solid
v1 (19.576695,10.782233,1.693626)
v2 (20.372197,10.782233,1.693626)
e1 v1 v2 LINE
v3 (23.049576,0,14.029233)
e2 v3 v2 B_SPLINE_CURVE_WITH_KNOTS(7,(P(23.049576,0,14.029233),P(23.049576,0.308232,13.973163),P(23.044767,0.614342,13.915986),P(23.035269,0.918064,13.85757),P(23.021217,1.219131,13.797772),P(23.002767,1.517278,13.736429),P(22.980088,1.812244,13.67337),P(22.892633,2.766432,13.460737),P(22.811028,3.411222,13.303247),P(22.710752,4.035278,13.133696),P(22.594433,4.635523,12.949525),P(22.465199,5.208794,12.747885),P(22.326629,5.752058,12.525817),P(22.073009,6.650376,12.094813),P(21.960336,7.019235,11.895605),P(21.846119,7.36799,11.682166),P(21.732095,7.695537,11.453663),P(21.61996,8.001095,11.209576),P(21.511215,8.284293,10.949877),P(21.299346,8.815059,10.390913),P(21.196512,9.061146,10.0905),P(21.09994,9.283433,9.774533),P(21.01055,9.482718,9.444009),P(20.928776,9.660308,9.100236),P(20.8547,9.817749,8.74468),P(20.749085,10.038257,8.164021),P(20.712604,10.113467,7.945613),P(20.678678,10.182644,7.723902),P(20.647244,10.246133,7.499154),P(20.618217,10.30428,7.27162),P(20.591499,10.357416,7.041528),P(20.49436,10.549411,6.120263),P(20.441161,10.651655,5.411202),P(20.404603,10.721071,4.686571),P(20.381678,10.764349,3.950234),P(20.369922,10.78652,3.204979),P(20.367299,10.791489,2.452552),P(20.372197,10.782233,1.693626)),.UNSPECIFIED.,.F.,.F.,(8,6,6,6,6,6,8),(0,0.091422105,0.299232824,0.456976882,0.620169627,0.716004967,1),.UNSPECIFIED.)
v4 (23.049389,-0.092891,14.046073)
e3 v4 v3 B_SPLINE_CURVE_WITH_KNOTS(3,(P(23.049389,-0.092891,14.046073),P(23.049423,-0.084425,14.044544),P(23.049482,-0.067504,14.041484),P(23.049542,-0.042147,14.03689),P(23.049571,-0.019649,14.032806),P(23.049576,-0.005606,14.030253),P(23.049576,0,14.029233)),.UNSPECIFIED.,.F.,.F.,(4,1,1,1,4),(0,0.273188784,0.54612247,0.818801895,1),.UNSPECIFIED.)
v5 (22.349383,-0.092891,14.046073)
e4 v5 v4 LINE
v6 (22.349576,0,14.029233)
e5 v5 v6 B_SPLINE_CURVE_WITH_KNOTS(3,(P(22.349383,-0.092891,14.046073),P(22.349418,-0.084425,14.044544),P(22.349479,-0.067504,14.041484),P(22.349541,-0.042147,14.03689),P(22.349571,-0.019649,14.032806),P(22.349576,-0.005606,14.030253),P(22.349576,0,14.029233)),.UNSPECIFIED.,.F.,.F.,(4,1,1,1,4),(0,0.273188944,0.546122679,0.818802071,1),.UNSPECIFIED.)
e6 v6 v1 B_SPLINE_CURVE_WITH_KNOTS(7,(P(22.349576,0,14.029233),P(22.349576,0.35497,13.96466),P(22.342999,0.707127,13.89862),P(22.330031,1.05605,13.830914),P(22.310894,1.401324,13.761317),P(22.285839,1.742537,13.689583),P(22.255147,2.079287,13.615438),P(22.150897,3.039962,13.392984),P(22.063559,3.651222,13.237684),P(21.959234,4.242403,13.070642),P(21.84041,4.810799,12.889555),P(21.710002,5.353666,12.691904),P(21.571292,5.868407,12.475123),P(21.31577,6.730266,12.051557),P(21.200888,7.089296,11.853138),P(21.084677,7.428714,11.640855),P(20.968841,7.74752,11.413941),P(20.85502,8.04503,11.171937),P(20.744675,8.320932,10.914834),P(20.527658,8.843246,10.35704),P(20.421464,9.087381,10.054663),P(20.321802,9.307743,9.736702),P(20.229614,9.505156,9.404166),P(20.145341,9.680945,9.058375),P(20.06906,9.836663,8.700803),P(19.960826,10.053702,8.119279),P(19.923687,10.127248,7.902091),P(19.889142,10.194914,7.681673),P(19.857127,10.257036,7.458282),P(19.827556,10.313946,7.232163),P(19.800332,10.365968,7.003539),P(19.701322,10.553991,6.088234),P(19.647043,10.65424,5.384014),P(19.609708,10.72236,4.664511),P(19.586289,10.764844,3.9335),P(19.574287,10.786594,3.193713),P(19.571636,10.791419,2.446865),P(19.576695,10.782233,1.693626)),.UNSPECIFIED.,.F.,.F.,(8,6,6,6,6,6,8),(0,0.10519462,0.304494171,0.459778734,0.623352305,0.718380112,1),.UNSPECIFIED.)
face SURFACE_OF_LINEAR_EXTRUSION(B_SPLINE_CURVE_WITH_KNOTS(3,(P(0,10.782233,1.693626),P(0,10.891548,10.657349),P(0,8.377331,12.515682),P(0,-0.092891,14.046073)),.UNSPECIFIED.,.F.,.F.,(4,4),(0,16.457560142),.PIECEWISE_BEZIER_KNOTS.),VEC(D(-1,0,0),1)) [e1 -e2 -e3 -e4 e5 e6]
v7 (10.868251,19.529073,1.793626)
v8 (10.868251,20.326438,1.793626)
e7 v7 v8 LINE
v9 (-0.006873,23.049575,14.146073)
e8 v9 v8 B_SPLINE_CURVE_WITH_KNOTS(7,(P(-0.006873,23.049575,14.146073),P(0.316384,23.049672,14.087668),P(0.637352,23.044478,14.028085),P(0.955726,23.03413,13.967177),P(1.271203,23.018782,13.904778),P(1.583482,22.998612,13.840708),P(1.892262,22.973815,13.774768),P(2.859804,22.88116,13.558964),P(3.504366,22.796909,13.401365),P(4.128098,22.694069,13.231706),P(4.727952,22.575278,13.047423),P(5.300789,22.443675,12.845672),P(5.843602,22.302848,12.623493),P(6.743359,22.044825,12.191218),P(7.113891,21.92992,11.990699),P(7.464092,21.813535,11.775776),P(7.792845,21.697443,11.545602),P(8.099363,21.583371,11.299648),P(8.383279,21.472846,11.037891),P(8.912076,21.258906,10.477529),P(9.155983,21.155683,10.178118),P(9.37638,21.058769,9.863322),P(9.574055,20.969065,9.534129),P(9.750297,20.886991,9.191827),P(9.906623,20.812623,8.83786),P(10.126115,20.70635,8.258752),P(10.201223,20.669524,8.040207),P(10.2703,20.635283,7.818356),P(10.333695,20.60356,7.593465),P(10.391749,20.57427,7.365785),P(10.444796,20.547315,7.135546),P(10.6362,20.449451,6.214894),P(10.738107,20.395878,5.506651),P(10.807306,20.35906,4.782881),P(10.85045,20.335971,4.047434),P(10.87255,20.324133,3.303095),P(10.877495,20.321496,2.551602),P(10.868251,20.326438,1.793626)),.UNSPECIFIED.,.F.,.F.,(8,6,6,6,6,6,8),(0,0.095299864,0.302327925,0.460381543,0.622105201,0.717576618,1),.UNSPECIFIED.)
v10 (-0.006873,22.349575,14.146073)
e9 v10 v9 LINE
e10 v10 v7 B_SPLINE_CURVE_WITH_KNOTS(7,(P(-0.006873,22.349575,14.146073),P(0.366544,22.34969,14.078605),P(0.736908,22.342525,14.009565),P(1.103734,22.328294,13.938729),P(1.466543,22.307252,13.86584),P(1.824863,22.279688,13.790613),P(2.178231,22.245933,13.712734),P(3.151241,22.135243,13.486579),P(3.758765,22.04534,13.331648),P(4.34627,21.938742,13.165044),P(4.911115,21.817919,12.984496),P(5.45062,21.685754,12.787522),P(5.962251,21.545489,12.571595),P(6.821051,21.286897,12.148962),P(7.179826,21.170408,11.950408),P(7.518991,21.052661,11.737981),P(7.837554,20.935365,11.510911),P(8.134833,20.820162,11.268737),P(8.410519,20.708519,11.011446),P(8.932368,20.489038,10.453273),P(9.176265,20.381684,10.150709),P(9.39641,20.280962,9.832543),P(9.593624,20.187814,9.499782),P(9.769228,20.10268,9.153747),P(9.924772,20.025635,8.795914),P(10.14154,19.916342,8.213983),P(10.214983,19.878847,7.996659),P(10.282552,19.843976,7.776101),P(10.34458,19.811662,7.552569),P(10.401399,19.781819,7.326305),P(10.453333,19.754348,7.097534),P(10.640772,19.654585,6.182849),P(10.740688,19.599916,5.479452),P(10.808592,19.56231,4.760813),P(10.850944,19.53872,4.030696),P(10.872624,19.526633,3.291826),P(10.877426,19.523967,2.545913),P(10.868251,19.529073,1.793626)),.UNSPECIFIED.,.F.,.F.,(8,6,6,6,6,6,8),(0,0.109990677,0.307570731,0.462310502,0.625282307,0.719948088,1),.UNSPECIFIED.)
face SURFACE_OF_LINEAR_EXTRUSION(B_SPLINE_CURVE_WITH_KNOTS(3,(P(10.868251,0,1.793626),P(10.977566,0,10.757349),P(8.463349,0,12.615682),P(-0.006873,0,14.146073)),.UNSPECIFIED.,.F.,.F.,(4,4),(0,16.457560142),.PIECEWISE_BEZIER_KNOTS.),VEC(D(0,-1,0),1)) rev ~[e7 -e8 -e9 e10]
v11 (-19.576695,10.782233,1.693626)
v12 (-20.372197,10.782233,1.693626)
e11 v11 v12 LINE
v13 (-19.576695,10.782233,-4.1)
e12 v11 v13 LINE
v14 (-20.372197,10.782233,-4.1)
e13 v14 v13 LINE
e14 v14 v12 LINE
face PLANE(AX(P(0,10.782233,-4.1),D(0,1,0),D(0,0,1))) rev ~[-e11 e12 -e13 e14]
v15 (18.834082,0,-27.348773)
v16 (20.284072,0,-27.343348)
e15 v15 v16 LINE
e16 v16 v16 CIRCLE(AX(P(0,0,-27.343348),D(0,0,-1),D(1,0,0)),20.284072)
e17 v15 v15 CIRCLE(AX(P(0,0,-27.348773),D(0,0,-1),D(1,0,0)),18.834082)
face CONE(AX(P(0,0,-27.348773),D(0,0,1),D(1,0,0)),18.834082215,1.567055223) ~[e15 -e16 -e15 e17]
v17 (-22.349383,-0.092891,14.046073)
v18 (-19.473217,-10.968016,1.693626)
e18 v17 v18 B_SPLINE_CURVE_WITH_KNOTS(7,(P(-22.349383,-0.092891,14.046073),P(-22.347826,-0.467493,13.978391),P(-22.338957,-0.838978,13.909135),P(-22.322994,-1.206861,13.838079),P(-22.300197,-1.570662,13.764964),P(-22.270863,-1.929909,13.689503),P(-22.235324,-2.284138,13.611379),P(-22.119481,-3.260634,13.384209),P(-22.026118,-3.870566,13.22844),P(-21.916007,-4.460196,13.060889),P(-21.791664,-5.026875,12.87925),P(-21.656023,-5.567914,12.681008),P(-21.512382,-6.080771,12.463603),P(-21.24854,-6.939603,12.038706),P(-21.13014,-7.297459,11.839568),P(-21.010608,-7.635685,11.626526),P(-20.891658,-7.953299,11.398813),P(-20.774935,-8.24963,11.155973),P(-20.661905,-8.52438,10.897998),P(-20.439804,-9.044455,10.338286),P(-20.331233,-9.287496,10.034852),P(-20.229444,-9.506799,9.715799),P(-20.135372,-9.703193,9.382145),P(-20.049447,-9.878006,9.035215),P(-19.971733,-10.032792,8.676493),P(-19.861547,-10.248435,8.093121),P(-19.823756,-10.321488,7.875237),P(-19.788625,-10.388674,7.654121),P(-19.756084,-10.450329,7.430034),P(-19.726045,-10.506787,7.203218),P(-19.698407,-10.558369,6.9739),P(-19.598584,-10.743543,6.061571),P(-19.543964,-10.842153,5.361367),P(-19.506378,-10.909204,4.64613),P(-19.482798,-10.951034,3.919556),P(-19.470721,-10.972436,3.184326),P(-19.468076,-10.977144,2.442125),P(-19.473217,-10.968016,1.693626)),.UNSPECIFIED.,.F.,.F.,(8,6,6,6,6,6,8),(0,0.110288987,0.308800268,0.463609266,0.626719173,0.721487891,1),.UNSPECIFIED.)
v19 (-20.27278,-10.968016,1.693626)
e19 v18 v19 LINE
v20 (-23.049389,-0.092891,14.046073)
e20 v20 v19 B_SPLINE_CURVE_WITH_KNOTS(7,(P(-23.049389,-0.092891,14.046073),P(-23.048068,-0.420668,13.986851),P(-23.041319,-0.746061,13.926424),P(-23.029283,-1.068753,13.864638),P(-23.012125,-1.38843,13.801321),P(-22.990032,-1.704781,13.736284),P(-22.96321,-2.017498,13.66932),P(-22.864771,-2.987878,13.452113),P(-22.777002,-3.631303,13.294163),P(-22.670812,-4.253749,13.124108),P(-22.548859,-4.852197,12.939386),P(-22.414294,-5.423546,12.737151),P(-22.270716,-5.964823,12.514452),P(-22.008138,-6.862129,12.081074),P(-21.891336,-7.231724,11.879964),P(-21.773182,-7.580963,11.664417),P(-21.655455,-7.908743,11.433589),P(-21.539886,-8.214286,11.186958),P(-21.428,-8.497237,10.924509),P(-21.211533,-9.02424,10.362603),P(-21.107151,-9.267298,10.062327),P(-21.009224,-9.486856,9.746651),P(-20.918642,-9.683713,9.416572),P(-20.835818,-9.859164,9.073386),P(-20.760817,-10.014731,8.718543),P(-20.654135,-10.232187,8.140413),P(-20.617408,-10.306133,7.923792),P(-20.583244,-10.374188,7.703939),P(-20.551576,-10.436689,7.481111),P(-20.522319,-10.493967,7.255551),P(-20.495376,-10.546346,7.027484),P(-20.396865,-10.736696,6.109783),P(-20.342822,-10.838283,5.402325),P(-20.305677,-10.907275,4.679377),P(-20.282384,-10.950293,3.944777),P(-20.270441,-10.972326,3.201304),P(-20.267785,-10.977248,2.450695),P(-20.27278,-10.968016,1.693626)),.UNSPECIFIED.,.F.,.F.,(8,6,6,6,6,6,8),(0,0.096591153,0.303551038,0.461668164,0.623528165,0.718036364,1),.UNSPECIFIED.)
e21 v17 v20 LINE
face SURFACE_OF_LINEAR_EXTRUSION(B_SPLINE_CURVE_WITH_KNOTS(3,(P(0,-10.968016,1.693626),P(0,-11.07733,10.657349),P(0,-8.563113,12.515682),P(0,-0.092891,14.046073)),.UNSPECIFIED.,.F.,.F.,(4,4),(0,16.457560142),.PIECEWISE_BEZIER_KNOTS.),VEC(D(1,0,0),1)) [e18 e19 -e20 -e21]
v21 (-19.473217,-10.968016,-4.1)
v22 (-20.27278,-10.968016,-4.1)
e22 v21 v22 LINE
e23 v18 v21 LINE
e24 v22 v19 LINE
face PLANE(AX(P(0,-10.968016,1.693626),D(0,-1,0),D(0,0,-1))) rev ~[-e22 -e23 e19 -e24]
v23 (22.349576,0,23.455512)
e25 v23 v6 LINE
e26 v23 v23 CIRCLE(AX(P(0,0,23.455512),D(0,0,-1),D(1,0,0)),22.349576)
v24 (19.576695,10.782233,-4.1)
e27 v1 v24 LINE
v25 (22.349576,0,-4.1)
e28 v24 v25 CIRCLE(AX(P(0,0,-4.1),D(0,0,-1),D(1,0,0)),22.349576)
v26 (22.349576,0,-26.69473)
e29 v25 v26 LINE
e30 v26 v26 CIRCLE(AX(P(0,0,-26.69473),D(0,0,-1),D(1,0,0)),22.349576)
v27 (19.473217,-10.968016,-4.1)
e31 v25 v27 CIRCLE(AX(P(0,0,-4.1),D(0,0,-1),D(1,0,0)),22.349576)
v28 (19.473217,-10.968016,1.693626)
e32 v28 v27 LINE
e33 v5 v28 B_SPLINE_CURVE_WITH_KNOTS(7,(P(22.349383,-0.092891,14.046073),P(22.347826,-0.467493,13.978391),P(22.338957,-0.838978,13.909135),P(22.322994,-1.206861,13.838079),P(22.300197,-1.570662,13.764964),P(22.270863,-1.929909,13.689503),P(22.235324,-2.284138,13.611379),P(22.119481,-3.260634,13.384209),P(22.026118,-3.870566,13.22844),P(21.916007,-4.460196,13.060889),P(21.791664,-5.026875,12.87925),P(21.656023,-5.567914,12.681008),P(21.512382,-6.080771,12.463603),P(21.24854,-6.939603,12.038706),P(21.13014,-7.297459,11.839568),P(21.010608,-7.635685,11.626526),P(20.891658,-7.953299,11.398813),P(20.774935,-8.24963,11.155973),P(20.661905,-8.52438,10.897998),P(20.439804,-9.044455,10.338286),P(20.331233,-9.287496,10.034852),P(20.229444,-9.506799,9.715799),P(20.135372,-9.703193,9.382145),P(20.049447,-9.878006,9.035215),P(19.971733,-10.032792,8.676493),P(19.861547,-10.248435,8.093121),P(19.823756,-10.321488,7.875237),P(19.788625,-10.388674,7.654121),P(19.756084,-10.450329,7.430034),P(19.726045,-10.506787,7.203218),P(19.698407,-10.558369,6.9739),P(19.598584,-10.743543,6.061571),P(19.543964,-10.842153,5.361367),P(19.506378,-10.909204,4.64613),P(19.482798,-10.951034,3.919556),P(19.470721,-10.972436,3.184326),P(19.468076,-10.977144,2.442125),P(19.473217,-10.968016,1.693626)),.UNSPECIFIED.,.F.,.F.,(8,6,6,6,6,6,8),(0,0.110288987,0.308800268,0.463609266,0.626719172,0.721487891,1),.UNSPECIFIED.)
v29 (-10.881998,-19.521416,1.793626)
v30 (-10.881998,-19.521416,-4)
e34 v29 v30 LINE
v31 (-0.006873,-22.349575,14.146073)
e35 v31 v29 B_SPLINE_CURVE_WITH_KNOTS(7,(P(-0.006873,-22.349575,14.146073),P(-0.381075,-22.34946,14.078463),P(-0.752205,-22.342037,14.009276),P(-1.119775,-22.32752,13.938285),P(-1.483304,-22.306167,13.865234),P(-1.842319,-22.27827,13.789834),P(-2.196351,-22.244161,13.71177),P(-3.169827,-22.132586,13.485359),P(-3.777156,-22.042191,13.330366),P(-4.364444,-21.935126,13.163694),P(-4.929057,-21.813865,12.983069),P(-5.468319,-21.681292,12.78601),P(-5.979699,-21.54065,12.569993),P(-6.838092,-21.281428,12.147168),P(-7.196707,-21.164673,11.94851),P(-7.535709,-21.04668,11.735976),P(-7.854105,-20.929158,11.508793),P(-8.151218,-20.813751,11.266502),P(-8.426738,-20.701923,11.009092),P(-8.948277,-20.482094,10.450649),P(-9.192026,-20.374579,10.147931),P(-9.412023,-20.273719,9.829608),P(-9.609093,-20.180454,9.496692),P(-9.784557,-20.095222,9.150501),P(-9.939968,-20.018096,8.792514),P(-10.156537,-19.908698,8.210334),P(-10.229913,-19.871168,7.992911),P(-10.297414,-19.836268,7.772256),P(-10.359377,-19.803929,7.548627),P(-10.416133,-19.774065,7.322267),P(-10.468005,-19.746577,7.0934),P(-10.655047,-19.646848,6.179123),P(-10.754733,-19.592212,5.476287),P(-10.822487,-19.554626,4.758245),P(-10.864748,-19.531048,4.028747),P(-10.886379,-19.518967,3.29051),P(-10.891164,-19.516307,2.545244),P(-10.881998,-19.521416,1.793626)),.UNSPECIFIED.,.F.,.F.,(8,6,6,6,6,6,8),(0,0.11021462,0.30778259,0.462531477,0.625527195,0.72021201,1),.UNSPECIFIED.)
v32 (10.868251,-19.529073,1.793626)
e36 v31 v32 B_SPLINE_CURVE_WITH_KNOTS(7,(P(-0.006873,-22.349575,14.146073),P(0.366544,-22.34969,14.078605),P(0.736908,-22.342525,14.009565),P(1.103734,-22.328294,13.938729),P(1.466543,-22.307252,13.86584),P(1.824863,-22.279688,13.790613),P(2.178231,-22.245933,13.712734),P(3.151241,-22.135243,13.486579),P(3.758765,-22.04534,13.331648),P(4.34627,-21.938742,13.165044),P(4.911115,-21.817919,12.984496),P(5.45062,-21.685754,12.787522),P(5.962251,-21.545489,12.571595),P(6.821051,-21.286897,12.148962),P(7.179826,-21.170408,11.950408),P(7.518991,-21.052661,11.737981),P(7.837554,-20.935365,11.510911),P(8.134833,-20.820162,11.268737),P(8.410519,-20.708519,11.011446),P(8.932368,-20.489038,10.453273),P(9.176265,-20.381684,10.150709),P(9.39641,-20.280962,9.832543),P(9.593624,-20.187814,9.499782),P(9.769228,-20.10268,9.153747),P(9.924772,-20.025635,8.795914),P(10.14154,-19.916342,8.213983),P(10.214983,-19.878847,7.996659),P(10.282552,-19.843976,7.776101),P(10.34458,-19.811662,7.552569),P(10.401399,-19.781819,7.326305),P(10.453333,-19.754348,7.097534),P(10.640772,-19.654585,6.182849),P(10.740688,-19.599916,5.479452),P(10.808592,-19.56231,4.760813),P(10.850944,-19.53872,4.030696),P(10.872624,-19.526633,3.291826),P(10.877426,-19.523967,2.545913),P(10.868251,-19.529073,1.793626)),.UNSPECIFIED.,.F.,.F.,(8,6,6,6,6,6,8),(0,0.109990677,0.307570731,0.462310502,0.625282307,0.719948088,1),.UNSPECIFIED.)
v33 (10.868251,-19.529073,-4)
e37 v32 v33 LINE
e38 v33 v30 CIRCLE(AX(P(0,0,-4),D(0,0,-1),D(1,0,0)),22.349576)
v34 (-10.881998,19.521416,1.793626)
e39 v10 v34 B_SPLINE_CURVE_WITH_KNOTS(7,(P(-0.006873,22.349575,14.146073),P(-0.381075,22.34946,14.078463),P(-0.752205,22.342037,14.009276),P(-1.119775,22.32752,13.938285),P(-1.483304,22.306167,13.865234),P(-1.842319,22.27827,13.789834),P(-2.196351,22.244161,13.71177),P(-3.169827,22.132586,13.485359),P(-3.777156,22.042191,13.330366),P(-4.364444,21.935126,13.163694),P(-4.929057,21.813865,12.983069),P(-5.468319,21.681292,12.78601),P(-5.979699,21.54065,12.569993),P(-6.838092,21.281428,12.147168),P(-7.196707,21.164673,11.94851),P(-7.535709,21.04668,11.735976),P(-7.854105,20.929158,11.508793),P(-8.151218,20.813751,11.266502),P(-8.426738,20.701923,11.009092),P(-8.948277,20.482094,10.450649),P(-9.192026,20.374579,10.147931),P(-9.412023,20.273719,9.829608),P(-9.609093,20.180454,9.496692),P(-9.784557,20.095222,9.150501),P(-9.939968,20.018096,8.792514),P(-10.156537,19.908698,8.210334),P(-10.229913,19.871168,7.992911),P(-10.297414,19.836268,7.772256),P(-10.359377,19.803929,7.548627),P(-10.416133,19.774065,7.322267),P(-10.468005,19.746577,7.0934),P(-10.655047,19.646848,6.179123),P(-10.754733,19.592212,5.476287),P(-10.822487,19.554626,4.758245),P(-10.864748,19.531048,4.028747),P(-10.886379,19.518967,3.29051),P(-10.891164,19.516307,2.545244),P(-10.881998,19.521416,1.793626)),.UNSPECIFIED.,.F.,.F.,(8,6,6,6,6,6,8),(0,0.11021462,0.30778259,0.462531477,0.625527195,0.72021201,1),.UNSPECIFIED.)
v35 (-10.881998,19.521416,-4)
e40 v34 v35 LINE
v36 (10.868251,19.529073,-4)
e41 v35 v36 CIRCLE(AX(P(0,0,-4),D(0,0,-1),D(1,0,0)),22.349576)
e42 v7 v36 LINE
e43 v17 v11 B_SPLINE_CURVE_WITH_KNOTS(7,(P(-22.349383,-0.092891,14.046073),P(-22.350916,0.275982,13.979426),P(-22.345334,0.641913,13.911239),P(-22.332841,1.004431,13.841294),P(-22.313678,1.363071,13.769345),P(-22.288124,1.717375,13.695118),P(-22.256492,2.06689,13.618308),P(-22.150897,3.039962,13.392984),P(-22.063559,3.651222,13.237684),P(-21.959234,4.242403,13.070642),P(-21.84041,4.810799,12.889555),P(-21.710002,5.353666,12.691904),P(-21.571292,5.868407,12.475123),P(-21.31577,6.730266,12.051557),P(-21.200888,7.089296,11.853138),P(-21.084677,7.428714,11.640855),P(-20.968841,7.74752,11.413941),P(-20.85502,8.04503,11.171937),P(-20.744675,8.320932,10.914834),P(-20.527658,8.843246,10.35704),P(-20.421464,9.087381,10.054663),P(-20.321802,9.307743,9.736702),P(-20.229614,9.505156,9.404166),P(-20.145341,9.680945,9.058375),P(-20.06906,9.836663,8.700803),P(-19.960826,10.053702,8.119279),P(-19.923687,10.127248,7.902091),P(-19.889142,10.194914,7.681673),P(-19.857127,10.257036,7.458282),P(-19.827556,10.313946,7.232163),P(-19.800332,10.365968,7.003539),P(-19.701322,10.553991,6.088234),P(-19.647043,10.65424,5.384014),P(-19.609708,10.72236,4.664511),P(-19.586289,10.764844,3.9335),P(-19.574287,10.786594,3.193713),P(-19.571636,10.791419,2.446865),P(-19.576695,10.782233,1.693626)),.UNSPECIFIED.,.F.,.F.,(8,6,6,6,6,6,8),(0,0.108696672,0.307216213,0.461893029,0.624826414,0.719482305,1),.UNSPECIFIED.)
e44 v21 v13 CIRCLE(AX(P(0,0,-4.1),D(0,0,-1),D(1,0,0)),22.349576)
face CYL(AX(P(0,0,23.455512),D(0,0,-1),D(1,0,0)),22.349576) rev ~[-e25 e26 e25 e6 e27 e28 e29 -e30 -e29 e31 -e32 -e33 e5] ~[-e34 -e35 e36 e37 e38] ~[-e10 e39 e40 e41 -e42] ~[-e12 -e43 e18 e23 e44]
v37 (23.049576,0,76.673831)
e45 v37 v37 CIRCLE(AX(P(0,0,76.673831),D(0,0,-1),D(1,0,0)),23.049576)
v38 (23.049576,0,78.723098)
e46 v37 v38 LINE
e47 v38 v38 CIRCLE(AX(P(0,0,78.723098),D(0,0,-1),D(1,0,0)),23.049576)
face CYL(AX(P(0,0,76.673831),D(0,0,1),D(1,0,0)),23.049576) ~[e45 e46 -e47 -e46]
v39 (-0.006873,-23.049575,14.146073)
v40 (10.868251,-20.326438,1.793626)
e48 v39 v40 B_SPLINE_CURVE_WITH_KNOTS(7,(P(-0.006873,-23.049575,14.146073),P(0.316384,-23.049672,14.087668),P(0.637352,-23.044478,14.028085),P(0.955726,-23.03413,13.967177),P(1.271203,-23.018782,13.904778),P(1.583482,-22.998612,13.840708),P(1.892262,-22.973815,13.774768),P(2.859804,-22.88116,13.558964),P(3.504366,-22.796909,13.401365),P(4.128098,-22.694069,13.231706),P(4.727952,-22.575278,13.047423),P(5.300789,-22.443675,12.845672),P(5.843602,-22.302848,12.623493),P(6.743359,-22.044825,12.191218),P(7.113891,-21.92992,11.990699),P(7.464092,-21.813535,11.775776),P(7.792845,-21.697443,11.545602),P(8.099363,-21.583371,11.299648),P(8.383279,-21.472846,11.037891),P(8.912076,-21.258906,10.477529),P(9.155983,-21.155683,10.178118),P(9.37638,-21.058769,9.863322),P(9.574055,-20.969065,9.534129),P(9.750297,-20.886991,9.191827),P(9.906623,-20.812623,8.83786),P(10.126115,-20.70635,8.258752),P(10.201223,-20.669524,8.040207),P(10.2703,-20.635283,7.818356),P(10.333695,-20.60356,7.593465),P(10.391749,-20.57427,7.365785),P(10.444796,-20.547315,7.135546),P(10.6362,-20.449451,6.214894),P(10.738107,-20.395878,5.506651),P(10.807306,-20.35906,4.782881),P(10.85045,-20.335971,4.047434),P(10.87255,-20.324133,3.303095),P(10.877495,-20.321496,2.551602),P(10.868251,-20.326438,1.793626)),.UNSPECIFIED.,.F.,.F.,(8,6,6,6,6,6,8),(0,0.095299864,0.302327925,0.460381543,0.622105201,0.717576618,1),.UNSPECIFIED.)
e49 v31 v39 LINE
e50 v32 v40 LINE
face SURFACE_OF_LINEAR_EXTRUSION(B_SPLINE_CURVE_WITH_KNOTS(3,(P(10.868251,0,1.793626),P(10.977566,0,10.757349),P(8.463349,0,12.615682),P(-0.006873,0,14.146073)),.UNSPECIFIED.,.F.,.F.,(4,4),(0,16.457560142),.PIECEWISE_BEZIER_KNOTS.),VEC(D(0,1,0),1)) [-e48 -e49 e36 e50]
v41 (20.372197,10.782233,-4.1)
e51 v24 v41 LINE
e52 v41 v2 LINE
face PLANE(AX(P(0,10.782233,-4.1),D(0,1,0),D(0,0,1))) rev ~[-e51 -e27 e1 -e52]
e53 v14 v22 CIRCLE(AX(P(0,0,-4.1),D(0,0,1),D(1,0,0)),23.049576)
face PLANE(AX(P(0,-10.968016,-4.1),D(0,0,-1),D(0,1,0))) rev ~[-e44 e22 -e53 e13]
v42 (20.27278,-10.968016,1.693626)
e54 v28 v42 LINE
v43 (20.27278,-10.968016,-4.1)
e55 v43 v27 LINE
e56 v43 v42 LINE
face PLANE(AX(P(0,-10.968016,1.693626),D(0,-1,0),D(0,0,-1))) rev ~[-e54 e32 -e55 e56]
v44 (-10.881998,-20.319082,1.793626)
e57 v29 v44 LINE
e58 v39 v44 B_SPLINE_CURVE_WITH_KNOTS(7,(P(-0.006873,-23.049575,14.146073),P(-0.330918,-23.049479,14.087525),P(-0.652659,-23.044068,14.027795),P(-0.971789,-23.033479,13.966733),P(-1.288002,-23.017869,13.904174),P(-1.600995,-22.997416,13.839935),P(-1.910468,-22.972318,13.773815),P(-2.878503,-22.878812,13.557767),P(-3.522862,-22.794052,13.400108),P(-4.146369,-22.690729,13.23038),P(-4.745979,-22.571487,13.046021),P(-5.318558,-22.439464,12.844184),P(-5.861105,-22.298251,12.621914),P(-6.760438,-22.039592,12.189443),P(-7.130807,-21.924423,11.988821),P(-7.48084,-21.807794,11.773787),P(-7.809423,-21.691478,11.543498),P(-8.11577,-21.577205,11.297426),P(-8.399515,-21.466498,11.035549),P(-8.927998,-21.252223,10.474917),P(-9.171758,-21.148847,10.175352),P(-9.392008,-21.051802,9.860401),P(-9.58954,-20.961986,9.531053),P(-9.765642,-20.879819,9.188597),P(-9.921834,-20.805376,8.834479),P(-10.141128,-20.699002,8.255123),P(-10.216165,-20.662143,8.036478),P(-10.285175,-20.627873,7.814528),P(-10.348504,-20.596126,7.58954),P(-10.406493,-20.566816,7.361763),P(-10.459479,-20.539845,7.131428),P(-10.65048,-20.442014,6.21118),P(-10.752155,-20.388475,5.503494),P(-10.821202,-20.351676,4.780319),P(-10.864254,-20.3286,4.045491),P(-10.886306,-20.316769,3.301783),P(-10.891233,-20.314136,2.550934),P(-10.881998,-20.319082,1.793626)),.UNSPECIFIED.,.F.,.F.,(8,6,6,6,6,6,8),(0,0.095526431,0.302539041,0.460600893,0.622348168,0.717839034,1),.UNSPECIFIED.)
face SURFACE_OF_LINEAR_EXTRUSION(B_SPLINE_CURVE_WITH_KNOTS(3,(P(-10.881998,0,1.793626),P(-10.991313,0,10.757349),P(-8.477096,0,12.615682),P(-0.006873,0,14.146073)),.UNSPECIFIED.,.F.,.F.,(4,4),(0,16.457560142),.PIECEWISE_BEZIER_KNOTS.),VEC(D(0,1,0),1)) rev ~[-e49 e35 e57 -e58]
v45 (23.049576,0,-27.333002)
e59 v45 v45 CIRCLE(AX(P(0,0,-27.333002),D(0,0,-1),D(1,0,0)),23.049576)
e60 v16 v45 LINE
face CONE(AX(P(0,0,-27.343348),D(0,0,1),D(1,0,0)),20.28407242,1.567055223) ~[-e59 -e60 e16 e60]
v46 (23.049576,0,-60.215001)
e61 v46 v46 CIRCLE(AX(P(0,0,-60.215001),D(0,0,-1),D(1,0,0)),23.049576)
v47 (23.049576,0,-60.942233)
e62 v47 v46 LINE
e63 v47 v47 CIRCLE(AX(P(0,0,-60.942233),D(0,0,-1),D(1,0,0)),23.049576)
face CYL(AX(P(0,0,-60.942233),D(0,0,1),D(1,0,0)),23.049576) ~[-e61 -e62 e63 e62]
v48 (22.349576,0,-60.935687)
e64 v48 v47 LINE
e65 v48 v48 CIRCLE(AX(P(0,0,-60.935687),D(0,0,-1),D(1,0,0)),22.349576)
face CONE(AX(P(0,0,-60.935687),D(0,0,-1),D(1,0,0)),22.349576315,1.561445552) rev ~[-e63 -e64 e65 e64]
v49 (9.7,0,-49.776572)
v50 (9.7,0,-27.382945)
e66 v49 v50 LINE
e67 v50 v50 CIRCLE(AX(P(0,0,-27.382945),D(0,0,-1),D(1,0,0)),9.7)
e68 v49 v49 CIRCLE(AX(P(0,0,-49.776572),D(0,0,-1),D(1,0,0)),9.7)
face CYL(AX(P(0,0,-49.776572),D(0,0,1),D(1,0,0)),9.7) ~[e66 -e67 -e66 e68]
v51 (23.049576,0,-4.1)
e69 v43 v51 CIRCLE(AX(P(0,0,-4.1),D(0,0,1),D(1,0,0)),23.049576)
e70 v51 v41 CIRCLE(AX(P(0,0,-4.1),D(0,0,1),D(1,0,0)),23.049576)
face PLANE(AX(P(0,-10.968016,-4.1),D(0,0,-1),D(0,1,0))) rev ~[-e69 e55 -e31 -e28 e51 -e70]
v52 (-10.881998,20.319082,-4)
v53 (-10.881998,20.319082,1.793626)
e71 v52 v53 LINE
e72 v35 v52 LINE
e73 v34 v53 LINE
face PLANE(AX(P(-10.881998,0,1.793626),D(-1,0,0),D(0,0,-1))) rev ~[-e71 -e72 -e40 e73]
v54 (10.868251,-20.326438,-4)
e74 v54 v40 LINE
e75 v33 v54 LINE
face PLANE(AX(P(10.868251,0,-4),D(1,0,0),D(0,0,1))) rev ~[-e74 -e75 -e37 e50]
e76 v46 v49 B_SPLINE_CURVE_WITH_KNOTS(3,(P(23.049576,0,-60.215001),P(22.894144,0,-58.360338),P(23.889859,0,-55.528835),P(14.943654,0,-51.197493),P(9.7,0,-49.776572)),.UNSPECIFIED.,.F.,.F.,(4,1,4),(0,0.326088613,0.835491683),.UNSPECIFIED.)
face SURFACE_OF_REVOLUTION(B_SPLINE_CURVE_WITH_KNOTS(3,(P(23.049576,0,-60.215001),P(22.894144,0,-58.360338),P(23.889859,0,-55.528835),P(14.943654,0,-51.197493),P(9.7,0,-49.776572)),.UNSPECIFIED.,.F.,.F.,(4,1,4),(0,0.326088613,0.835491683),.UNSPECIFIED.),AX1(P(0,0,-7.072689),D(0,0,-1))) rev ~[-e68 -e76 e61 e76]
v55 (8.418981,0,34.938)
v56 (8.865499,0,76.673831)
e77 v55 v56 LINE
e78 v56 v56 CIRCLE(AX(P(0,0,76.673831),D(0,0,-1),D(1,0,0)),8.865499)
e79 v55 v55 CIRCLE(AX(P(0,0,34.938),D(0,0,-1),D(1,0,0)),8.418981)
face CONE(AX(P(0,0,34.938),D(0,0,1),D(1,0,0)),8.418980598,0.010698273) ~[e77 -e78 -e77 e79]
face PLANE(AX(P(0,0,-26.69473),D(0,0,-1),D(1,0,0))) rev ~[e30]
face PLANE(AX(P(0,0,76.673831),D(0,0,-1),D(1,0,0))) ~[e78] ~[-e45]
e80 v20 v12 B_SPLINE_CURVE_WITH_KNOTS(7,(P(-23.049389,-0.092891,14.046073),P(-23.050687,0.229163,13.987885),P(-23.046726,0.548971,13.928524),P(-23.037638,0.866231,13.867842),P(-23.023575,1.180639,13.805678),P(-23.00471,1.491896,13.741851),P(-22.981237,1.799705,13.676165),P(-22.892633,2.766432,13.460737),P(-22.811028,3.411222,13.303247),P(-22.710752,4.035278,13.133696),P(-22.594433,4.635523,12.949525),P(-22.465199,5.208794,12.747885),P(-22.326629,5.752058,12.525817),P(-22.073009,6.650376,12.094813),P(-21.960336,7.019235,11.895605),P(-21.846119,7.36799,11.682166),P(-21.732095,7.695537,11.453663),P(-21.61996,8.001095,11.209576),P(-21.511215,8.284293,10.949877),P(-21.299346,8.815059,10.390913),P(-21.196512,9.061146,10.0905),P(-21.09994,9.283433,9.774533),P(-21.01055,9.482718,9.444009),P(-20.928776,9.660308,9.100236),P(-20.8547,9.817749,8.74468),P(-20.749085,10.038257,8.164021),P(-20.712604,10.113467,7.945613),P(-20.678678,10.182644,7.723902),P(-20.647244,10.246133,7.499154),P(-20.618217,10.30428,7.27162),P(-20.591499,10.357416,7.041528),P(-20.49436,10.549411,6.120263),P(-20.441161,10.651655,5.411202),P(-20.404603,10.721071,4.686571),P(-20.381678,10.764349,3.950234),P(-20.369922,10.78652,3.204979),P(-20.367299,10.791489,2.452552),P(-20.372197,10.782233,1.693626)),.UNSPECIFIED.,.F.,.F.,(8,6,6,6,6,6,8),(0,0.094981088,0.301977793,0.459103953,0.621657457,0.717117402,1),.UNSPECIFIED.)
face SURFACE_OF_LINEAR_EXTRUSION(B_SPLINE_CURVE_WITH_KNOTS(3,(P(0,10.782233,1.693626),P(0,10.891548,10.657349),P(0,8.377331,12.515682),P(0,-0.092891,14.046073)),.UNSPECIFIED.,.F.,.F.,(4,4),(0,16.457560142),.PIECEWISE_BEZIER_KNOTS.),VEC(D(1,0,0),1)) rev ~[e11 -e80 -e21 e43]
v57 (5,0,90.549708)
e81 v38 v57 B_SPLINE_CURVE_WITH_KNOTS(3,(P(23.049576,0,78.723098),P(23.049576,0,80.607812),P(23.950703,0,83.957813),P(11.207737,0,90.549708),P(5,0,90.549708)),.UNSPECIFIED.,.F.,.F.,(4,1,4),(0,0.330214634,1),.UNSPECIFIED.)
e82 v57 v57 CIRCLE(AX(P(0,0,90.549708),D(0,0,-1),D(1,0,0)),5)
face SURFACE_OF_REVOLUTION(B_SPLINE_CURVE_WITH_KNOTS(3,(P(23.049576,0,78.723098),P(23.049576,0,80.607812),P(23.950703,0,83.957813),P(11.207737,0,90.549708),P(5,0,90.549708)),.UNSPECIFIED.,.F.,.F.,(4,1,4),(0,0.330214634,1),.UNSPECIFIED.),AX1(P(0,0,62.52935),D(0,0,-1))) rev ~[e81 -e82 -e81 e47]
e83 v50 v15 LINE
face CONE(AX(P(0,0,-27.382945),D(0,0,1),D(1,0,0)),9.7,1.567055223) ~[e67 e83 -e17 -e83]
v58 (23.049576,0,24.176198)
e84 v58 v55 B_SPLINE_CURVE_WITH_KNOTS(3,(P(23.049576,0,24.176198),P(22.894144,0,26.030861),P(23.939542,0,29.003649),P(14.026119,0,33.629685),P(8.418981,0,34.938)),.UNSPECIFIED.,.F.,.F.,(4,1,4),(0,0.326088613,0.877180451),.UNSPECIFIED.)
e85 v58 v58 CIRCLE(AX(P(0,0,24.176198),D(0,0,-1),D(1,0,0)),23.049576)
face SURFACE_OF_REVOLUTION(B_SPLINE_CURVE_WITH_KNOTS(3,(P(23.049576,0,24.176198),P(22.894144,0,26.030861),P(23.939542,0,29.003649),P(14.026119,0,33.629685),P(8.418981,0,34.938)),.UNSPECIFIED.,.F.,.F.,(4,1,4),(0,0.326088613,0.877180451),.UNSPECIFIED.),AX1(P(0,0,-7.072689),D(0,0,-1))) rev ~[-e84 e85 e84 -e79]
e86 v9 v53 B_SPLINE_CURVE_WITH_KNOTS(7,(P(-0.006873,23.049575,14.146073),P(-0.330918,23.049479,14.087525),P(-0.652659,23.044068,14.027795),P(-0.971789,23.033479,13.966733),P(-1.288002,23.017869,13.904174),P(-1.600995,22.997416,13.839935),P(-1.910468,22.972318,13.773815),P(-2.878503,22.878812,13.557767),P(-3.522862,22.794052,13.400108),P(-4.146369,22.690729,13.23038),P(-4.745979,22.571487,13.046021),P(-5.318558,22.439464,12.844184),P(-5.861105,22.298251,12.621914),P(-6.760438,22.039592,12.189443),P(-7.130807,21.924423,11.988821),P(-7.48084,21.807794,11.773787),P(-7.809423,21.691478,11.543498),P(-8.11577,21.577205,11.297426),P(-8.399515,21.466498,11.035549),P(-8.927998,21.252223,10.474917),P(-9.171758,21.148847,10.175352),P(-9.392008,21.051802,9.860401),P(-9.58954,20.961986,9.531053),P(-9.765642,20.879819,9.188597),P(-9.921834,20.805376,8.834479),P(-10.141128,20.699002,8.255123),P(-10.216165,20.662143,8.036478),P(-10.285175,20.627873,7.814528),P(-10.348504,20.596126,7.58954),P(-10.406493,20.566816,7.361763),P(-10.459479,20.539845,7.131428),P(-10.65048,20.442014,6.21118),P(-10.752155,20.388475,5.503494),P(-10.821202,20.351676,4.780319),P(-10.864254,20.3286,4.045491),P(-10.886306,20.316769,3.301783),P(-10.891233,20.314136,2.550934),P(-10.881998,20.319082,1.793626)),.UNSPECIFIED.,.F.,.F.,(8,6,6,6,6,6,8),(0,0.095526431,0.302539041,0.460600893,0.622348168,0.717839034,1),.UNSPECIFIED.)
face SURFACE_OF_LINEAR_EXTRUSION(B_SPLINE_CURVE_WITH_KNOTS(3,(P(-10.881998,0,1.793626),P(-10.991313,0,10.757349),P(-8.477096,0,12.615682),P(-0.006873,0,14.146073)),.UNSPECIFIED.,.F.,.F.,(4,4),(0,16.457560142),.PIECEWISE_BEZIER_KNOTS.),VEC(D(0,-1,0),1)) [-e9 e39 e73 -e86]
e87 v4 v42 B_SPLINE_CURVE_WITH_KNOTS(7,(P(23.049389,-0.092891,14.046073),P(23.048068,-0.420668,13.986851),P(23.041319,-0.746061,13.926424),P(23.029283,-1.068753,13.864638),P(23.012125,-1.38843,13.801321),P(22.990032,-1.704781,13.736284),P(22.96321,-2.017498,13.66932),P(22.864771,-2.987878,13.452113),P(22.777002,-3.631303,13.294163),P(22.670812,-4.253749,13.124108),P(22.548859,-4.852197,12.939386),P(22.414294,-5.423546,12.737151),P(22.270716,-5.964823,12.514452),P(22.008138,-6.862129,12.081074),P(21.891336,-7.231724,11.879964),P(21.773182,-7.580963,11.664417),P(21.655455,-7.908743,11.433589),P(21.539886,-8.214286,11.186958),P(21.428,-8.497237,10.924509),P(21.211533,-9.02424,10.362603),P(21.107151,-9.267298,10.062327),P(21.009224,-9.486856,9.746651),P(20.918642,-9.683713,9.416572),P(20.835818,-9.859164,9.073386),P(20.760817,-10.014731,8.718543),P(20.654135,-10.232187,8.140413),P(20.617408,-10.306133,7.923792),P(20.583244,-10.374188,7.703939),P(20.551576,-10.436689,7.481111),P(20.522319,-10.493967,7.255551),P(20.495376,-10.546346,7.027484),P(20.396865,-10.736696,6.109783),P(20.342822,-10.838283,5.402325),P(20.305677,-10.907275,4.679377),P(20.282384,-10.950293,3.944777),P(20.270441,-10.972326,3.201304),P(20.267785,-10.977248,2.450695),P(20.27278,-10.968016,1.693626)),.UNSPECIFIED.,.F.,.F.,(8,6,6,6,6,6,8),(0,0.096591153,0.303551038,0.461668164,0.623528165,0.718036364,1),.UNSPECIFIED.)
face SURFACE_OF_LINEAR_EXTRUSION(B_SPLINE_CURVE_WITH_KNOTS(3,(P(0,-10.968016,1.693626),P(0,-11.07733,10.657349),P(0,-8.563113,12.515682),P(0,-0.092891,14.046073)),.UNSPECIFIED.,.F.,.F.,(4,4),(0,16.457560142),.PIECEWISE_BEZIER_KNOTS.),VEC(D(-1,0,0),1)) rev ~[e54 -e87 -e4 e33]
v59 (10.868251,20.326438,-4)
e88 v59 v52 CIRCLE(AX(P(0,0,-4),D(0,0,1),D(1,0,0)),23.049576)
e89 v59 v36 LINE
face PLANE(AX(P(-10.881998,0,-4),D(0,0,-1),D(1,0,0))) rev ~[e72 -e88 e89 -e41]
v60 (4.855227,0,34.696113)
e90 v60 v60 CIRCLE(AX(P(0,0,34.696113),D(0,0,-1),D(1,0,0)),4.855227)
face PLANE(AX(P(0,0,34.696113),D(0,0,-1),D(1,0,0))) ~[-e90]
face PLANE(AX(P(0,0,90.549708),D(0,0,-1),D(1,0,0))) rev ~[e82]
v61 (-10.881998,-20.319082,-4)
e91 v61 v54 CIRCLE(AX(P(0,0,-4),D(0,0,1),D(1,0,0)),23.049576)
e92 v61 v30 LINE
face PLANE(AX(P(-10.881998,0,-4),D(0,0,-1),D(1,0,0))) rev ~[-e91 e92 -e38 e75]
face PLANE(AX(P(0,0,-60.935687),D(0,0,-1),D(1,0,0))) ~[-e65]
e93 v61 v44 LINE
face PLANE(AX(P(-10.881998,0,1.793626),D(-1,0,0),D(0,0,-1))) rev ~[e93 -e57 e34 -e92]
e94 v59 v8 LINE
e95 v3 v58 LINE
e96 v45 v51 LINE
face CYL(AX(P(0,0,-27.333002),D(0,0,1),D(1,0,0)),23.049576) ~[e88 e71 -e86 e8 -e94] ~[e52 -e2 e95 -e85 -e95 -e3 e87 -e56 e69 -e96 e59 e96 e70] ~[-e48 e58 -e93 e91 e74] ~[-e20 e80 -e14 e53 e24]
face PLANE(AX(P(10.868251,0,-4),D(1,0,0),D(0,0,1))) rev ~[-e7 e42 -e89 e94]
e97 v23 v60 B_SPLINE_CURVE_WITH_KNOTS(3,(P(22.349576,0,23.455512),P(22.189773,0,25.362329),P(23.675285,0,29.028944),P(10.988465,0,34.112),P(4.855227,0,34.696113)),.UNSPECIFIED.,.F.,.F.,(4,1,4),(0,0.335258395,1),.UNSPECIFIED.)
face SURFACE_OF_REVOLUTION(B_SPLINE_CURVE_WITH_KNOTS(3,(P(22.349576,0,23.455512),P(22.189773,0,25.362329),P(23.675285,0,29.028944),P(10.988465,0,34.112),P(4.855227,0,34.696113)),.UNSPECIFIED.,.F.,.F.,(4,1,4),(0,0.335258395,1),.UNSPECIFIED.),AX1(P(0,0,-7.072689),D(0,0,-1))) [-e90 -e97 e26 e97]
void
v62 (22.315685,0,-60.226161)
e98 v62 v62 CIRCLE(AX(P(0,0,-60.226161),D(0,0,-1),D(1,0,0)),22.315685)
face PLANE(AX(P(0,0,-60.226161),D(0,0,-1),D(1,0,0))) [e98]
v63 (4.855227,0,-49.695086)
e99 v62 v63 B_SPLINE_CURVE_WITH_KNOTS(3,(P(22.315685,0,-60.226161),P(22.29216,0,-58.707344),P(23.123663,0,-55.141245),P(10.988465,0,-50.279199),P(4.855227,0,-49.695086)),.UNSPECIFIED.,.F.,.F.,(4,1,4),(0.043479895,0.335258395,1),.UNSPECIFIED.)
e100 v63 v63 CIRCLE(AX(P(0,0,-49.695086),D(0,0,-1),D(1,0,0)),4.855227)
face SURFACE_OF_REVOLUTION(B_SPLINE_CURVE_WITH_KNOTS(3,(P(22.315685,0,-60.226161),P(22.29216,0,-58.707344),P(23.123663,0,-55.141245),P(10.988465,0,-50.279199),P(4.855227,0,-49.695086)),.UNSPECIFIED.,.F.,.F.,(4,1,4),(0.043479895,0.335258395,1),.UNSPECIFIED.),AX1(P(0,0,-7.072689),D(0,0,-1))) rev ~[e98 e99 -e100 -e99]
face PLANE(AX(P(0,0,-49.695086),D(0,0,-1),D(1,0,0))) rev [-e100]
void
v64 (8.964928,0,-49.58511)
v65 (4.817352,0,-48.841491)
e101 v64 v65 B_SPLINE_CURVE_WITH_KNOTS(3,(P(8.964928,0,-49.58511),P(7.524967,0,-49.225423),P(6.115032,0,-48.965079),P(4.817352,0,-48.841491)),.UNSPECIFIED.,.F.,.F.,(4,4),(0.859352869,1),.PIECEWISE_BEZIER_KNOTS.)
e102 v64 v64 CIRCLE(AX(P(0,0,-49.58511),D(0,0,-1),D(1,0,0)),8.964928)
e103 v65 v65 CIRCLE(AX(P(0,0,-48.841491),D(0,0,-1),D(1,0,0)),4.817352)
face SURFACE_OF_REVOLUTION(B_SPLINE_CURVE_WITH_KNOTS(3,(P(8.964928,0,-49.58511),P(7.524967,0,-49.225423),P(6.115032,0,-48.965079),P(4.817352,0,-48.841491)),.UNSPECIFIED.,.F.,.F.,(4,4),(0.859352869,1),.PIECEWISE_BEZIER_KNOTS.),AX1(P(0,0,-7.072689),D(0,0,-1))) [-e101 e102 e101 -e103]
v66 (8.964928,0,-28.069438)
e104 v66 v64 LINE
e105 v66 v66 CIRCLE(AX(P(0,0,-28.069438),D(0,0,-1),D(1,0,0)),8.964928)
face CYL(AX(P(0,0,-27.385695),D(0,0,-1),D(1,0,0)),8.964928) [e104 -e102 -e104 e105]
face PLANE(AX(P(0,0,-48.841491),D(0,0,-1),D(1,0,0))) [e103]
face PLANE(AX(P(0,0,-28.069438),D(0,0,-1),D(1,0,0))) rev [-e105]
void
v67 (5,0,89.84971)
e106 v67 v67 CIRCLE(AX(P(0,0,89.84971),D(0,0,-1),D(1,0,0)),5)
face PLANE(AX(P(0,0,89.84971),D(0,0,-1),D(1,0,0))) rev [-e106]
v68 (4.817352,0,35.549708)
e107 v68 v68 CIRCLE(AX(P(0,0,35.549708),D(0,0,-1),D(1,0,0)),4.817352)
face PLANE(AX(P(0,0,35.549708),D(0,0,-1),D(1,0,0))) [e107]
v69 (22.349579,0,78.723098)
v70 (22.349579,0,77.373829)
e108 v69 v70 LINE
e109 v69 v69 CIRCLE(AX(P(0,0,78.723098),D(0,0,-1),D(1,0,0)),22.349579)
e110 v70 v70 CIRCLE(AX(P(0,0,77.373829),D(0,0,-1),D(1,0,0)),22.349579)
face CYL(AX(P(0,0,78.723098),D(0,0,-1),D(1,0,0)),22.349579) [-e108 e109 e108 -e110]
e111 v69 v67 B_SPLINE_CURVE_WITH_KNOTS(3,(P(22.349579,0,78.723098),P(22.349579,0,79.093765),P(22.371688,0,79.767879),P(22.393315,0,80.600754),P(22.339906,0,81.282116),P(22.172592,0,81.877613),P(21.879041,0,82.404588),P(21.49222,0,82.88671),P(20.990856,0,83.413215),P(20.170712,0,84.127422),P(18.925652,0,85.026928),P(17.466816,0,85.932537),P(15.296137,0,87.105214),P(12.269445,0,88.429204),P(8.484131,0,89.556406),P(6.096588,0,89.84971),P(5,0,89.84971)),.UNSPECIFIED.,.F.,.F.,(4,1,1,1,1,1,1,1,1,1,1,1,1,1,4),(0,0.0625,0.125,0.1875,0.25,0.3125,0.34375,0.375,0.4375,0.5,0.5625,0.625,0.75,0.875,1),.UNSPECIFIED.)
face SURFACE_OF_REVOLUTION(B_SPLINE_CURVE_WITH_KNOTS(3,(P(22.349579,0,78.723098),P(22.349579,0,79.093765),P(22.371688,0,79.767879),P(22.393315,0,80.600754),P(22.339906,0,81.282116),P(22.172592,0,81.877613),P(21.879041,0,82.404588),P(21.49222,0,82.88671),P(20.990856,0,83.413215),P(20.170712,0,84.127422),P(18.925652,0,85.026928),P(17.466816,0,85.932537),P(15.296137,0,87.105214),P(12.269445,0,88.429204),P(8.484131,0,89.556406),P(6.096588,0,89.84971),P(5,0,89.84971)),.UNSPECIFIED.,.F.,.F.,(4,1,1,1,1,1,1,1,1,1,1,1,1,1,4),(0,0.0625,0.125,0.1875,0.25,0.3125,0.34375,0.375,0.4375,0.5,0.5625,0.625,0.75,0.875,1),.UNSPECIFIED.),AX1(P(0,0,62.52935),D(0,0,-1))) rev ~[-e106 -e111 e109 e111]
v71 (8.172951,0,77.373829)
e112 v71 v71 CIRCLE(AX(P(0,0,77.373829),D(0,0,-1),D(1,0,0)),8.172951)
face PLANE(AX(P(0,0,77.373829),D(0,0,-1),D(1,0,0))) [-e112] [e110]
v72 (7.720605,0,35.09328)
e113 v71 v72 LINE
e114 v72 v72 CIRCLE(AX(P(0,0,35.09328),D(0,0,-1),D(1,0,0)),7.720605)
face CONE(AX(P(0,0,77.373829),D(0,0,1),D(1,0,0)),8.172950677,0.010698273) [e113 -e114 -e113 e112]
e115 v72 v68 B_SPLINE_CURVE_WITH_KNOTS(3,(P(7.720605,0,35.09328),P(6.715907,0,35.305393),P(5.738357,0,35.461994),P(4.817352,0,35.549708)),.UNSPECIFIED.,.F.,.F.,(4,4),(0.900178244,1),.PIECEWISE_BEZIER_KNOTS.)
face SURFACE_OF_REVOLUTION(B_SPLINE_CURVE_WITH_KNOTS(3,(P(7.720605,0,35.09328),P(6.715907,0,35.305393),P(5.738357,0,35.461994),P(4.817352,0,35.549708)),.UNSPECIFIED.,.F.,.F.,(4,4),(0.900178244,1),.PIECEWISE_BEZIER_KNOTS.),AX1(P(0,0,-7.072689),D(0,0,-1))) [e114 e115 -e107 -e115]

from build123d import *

# Parameters (mm, degrees)
F4_DEPTH = 25
F6_DEPTH = 25


# Not quite as in the source:
# - the dataset's text gives a spline's control points without its knots; the knots are read off the source's solid


with BuildPart() as f1:
    # F0 (on Front) → F1 (revolve)
    with BuildSketch(Plane.XZ):
        with BuildLine():
            Line((20.2840724203, -27.343348276), (23.0495763149, -27.3330021896))
            Line((23.0495763149, -27.3330021896), (23.0495763149, 24.1761978883))
            add(Edge.make_bspline(
                [(23.0495763149, 24.1761978883), (22.8941435237, 26.0308608144), (23.9395420726, 29.003648868), (14.0261189654, 33.6296849109), (8.4189805979, 34.9379997258)],
                knots=[0, 0, 0, 0, 0.3260886129, 0.8771804513, 0.8771804513, 0.8771804513, 0.8771804513], degree=3))
            add(Edge.make_bspline(
                [(8.4189805979, 34.9379997258), (8.1849872822, 34.992597437), (7.9520754508, 35.0444122094), (7.7206045906, 35.0932804837)],
                knots=[0.8771804513, 0.8771804513, 0.8771804513, 0.8771804513, 0.9001782441, 0.9001782441, 0.9001782441, 0.9001782441], degree=3))
            add(Edge.make_bspline(
                [(7.7206045906, 35.0932804837), (6.7159069707, 35.3053928798), (5.7383570717, 35.4619936087), (4.8173516989, 35.5497077107)],
                knots=[0.9001782441, 0.9001782441, 0.9001782441, 0.9001782441, 1, 1, 1, 1], degree=3))
            Line((4.8173516989, 35.5497077107), (0, 35.5497077107))
            Line((0, 35.5497077107), (0, 34.6961133182))
            Line((0, 34.6961133182), (4.8552267253, 34.6961133182))
            add(Edge.make_bspline(
                [(22.3495763149, 23.4555121765), (22.1897726726, 25.3623291907), (23.6752847702, 29.0289436305), (10.9884647614, 34.112000041), (4.8552267253, 34.6961133182)],
                knots=[0, 0, 0, 0, 0.3352583947, 1, 1, 1, 1], degree=3))
            Line((22.3495763149, 23.4555121765), (22.3495763149, -26.6947299242))
            Line((22.3495763149, -26.6947299242), (0, -26.6947299242))
            Line((0, -26.6947299242), (0, -27.4192334573))
            Line((0, -27.4192334573), (8.9649282769, -27.3856945706))
            Line((8.9649282769, -27.3856945706), (9.7, -27.3829445779))
            Line((9.7, -27.3829445779), (18.8340822147, -27.3487728656))
            Line((18.8340822147, -27.3487728656), (20.2840724203, -27.343348276))
        make_face()
    revolve(axis=Axis((0, 0, -7.0726890117), (0, 0, -1)))

    # F0 (on Front) → F2 (revolve)
    with BuildSketch(Plane.XZ):
        with BuildLine():
            add(Edge.make_bspline(
                [(23.0495763149, -60.2150011641), (22.8941435237, -58.3603382379), (23.8898585914, -55.5288345389), (14.9436544002, -51.1974927604), (9.7, -49.7765717533)],
                knots=[0, 0, 0, 0, 0.3260886129, 0.8354916825, 0.8354916825, 0.8354916825, 0.8354916825], degree=3))
            add(Edge.make_bspline(
                [(9.7, -49.7765717533), (9.4543795426, -49.7100137308), (9.2092217969, -49.6461323577), (8.9649282769, -49.5851103148)],
                knots=[0.8354916825, 0.8354916825, 0.8354916825, 0.8354916825, 0.8593528689, 0.8593528689, 0.8593528689, 0.8593528689], degree=3))
            add(Edge.make_bspline(
                [(8.9649282769, -49.5851103148), (7.5249670698, -49.2254226142), (6.1150323727, -48.9650789974), (4.8173516989, -48.8414913416)],
                knots=[0.8593528689, 0.8593528689, 0.8593528689, 0.8593528689, 1, 1, 1, 1], degree=3))
            Line((4.8173516989, -48.8414913416), (0, -48.8414913416))
            Line((0, -48.8414913416), (0, -49.6950857341))
            Line((0, -49.6950857341), (4.8552267253, -49.6950857341))
            add(Edge.make_bspline(
                [(22.3156850975, -60.2261610329), (22.2921596802, -58.7073440576), (23.1236631734, -55.1412446649), (10.9884647614, -50.2791990114), (4.8552267253, -49.6950857341)],
                knots=[0.0434798946, 0.0434798946, 0.0434798946, 0.0434798946, 0.3352583947, 1, 1, 1, 1], degree=3))
            add(Edge.make_bspline(
                [(22.3495763149, -60.9356868758), (22.3288512693, -60.6883904498), (22.3191907796, -60.4524902586), (22.3156850975, -60.2261610329)],
                knots=[0, 0, 0, 0, 0.0434798946, 0.0434798946, 0.0434798946, 0.0434798946], degree=3))
            Line((22.3495763149, -60.9356868758), (23.0495763149, -60.9422326088))
            Line((23.0495763149, -60.9422326088), (23.0495763149, -60.2150011641))
        make_face()
        with BuildLine():
            Line((9.7, -49.5851103148), (9.7, -27.3829445779))
            Line((9.7, -27.3829445779), (8.9649282769, -27.3856945706))
            Line((8.9649282769, -27.3856945706), (8.9649282769, -28.0694384128))
            Line((8.9649282769, -28.0694384128), (8.9649282769, -49.5851103148))
            add(Edge.make_bspline(
                [(9.7, -49.7765717533), (9.4543795426, -49.7100137308), (9.2092217969, -49.6461323577), (8.9649282769, -49.5851103148)],
                knots=[0.8354916825, 0.8354916825, 0.8354916825, 0.8354916825, 0.8593528689, 0.8593528689, 0.8593528689, 0.8593528689], degree=3))
            Line((9.7, -49.7765717533), (9.7, -49.5851103148))
        make_face()
        with BuildLine():
            Line((0, -60.9356868758), (22.3495763149, -60.9356868758))
            add(Edge.make_bspline(
                [(22.3495763149, -60.9356868758), (22.3288512693, -60.6883904498), (22.3191907796, -60.4524902586), (22.3156850975, -60.2261610329)],
                knots=[0, 0, 0, 0, 0.0434798946, 0.0434798946, 0.0434798946, 0.0434798946], degree=3))
            Line((22.3156850975, -60.2261610329), (0, -60.2261610329))
            Line((0, -60.2261610329), (0, -60.9356868758))
        make_face()
        Polygon((8.9649282769, -28.0694384128), (8.9649282769, -27.3856945706), (0, -27.4192334573), (0, -28.0694384128), align=None)
    revolve(axis=Axis((0, 0, -7.0726890117), (0, 0, -1)))

    # F3 (on Right) → F4 (cut, symmetric)
    with BuildSketch(Plane.YZ):
        with BuildLine():
            Line((-10.9680155292, -4.0999995545), (-0.0928910449, -4.0999995545))
            Line((-0.0928910449, -4.0999995545), (10.7822334394, -4.0999995545))
            Line((10.7822334394, -4.0999995545), (10.7822334394, 1.6936261673))
            add(Edge.make_bspline(
                [(10.7822334394, 1.6936261673), (10.8915483579, 10.6573491357), (8.377331309, 12.5156822614), (-0.0928910449, 14.0460734256)],
                knots=[0, 0, 0, 0, 16.4575601417, 16.4575601417, 16.4575601417, 16.4575601417], degree=3))
            add(Edge.make_bspline(
                [(-10.9680155292, 1.6936261673), (-11.0773304477, 10.6573491357), (-8.5631133988, 12.5156822614), (-0.0928910449, 14.0460734256)],
                knots=[0, 0, 0, 0, 16.4575601417, 16.4575601417, 16.4575601417, 16.4575601417], degree=3))
            Line((-10.9680155292, 1.6936261673), (-10.9680155292, -4.0999995545))
        make_face()
    extrude(amount=F4_DEPTH, both=True, mode=Mode.SUBTRACT)

    # F5 (on Front) → F6 (cut, symmetric)
    with BuildSketch(Plane.XZ):
        with BuildLine():
            Line((-10.8819976449, -3.9999997243), (-0.0068731606, -3.9999997243))
            Line((-0.0068731606, -3.9999997243), (10.8682513237, -3.9999997243))
            Line((10.8682513237, -3.9999997243), (10.8682513237, 1.7936259974))
            add(Edge.make_bspline(
                [(10.8682513237, 1.7936259974), (10.9775662422, 10.7573489659), (8.4633491933, 12.6156820916), (-0.0068731606, 14.1460732557)],
                knots=[0, 0, 0, 0, 16.4575601417, 16.4575601417, 16.4575601417, 16.4575601417], degree=3))
            add(Edge.make_bspline(
                [(-10.8819976449, 1.7936259974), (-10.9913125634, 10.7573489659), (-8.4770955145, 12.6156820916), (-0.0068731606, 14.1460732557)],
                knots=[0, 0, 0, 0, 16.4575601417, 16.4575601417, 16.4575601417, 16.4575601417], degree=3))
            Line((-10.8819976449, 1.7936259974), (-10.8819976449, -3.9999997243))
        make_face()
    extrude(amount=F6_DEPTH, both=True, mode=Mode.SUBTRACT)

    # F0 (on Front) → F7 (revolve)
    with BuildSketch(Plane.XZ):
        with BuildLine():
            add(Edge.make_bspline(
                [(8.4189805979, 34.9379997258), (8.1849872822, 34.992597437), (7.9520754508, 35.0444122094), (7.7206045906, 35.0932804837)],
                knots=[0.8771804513, 0.8771804513, 0.8771804513, 0.8771804513, 0.9001782441, 0.9001782441, 0.9001782441, 0.9001782441], degree=3))
            Line((8.4189805979, 34.9379997258), (8.865498937, 76.6738313739))
            Line((8.865498937, 76.6738313739), (23.0495763148, 76.6738313739))
            Line((23.0495763148, 76.6738313739), (23.0495763148, 78.7230981444))
            add(Edge.make_bspline(
                [(23.0495763148, 78.7230981444), (23.0495763148, 80.6078122564), (23.9507031304, 83.9578134153), (11.2077367667, 90.5497077107), (5, 90.5497077107)],
                knots=[0, 0, 0, 0, 0.3302146344, 1, 1, 1, 1], degree=3))
            Line((5, 90.5497077107), (0, 90.5497077107))
            Line((0, 90.5497077107), (0, 89.8497104645))
            Line((0, 89.8497104645), (5, 89.8497104645))
            add(Edge.make_bspline(
                [(22.3495790686, 78.7230981444), (22.3495790686, 79.0937647853), (22.3716877562, 79.7678791576), (22.3933148354, 80.6007538754), (22.3399061529, 81.2821155275), (22.1725915882, 81.8776125403), (21.8790408964, 82.4045882825), (21.4922195357, 82.886710278), (20.9908563885, 83.4132154485), (20.1707115884, 84.1274223788), (18.9256521099, 85.0269281278), (17.4668159276, 85.9325369699), (15.2961373534, 87.1052139435), (12.269445396, 88.4292040949), (8.4841313235, 89.5564062965), (6.0965880095, 89.8497104645), (5, 89.8497104645)],
                knots=[0, 0, 0, 0, 0.0625, 0.125, 0.1875, 0.25, 0.3125, 0.34375, 0.375, 0.4375, 0.5, 0.5625, 0.625, 0.75, 0.875, 1, 1, 1, 1], degree=3))
            Line((22.3495790686, 78.7230981444), (22.3495790686, 77.3738286202))
            Line((22.3495790686, 77.3738286202), (8.1729506775, 77.3738286202))
            Line((8.1729506775, 77.3738286202), (7.7206045906, 35.0932804837))
        make_face()
    revolve(axis=Axis((0, 0, 62.5293496996), (0, 0, -1)))


solid = f1.part
